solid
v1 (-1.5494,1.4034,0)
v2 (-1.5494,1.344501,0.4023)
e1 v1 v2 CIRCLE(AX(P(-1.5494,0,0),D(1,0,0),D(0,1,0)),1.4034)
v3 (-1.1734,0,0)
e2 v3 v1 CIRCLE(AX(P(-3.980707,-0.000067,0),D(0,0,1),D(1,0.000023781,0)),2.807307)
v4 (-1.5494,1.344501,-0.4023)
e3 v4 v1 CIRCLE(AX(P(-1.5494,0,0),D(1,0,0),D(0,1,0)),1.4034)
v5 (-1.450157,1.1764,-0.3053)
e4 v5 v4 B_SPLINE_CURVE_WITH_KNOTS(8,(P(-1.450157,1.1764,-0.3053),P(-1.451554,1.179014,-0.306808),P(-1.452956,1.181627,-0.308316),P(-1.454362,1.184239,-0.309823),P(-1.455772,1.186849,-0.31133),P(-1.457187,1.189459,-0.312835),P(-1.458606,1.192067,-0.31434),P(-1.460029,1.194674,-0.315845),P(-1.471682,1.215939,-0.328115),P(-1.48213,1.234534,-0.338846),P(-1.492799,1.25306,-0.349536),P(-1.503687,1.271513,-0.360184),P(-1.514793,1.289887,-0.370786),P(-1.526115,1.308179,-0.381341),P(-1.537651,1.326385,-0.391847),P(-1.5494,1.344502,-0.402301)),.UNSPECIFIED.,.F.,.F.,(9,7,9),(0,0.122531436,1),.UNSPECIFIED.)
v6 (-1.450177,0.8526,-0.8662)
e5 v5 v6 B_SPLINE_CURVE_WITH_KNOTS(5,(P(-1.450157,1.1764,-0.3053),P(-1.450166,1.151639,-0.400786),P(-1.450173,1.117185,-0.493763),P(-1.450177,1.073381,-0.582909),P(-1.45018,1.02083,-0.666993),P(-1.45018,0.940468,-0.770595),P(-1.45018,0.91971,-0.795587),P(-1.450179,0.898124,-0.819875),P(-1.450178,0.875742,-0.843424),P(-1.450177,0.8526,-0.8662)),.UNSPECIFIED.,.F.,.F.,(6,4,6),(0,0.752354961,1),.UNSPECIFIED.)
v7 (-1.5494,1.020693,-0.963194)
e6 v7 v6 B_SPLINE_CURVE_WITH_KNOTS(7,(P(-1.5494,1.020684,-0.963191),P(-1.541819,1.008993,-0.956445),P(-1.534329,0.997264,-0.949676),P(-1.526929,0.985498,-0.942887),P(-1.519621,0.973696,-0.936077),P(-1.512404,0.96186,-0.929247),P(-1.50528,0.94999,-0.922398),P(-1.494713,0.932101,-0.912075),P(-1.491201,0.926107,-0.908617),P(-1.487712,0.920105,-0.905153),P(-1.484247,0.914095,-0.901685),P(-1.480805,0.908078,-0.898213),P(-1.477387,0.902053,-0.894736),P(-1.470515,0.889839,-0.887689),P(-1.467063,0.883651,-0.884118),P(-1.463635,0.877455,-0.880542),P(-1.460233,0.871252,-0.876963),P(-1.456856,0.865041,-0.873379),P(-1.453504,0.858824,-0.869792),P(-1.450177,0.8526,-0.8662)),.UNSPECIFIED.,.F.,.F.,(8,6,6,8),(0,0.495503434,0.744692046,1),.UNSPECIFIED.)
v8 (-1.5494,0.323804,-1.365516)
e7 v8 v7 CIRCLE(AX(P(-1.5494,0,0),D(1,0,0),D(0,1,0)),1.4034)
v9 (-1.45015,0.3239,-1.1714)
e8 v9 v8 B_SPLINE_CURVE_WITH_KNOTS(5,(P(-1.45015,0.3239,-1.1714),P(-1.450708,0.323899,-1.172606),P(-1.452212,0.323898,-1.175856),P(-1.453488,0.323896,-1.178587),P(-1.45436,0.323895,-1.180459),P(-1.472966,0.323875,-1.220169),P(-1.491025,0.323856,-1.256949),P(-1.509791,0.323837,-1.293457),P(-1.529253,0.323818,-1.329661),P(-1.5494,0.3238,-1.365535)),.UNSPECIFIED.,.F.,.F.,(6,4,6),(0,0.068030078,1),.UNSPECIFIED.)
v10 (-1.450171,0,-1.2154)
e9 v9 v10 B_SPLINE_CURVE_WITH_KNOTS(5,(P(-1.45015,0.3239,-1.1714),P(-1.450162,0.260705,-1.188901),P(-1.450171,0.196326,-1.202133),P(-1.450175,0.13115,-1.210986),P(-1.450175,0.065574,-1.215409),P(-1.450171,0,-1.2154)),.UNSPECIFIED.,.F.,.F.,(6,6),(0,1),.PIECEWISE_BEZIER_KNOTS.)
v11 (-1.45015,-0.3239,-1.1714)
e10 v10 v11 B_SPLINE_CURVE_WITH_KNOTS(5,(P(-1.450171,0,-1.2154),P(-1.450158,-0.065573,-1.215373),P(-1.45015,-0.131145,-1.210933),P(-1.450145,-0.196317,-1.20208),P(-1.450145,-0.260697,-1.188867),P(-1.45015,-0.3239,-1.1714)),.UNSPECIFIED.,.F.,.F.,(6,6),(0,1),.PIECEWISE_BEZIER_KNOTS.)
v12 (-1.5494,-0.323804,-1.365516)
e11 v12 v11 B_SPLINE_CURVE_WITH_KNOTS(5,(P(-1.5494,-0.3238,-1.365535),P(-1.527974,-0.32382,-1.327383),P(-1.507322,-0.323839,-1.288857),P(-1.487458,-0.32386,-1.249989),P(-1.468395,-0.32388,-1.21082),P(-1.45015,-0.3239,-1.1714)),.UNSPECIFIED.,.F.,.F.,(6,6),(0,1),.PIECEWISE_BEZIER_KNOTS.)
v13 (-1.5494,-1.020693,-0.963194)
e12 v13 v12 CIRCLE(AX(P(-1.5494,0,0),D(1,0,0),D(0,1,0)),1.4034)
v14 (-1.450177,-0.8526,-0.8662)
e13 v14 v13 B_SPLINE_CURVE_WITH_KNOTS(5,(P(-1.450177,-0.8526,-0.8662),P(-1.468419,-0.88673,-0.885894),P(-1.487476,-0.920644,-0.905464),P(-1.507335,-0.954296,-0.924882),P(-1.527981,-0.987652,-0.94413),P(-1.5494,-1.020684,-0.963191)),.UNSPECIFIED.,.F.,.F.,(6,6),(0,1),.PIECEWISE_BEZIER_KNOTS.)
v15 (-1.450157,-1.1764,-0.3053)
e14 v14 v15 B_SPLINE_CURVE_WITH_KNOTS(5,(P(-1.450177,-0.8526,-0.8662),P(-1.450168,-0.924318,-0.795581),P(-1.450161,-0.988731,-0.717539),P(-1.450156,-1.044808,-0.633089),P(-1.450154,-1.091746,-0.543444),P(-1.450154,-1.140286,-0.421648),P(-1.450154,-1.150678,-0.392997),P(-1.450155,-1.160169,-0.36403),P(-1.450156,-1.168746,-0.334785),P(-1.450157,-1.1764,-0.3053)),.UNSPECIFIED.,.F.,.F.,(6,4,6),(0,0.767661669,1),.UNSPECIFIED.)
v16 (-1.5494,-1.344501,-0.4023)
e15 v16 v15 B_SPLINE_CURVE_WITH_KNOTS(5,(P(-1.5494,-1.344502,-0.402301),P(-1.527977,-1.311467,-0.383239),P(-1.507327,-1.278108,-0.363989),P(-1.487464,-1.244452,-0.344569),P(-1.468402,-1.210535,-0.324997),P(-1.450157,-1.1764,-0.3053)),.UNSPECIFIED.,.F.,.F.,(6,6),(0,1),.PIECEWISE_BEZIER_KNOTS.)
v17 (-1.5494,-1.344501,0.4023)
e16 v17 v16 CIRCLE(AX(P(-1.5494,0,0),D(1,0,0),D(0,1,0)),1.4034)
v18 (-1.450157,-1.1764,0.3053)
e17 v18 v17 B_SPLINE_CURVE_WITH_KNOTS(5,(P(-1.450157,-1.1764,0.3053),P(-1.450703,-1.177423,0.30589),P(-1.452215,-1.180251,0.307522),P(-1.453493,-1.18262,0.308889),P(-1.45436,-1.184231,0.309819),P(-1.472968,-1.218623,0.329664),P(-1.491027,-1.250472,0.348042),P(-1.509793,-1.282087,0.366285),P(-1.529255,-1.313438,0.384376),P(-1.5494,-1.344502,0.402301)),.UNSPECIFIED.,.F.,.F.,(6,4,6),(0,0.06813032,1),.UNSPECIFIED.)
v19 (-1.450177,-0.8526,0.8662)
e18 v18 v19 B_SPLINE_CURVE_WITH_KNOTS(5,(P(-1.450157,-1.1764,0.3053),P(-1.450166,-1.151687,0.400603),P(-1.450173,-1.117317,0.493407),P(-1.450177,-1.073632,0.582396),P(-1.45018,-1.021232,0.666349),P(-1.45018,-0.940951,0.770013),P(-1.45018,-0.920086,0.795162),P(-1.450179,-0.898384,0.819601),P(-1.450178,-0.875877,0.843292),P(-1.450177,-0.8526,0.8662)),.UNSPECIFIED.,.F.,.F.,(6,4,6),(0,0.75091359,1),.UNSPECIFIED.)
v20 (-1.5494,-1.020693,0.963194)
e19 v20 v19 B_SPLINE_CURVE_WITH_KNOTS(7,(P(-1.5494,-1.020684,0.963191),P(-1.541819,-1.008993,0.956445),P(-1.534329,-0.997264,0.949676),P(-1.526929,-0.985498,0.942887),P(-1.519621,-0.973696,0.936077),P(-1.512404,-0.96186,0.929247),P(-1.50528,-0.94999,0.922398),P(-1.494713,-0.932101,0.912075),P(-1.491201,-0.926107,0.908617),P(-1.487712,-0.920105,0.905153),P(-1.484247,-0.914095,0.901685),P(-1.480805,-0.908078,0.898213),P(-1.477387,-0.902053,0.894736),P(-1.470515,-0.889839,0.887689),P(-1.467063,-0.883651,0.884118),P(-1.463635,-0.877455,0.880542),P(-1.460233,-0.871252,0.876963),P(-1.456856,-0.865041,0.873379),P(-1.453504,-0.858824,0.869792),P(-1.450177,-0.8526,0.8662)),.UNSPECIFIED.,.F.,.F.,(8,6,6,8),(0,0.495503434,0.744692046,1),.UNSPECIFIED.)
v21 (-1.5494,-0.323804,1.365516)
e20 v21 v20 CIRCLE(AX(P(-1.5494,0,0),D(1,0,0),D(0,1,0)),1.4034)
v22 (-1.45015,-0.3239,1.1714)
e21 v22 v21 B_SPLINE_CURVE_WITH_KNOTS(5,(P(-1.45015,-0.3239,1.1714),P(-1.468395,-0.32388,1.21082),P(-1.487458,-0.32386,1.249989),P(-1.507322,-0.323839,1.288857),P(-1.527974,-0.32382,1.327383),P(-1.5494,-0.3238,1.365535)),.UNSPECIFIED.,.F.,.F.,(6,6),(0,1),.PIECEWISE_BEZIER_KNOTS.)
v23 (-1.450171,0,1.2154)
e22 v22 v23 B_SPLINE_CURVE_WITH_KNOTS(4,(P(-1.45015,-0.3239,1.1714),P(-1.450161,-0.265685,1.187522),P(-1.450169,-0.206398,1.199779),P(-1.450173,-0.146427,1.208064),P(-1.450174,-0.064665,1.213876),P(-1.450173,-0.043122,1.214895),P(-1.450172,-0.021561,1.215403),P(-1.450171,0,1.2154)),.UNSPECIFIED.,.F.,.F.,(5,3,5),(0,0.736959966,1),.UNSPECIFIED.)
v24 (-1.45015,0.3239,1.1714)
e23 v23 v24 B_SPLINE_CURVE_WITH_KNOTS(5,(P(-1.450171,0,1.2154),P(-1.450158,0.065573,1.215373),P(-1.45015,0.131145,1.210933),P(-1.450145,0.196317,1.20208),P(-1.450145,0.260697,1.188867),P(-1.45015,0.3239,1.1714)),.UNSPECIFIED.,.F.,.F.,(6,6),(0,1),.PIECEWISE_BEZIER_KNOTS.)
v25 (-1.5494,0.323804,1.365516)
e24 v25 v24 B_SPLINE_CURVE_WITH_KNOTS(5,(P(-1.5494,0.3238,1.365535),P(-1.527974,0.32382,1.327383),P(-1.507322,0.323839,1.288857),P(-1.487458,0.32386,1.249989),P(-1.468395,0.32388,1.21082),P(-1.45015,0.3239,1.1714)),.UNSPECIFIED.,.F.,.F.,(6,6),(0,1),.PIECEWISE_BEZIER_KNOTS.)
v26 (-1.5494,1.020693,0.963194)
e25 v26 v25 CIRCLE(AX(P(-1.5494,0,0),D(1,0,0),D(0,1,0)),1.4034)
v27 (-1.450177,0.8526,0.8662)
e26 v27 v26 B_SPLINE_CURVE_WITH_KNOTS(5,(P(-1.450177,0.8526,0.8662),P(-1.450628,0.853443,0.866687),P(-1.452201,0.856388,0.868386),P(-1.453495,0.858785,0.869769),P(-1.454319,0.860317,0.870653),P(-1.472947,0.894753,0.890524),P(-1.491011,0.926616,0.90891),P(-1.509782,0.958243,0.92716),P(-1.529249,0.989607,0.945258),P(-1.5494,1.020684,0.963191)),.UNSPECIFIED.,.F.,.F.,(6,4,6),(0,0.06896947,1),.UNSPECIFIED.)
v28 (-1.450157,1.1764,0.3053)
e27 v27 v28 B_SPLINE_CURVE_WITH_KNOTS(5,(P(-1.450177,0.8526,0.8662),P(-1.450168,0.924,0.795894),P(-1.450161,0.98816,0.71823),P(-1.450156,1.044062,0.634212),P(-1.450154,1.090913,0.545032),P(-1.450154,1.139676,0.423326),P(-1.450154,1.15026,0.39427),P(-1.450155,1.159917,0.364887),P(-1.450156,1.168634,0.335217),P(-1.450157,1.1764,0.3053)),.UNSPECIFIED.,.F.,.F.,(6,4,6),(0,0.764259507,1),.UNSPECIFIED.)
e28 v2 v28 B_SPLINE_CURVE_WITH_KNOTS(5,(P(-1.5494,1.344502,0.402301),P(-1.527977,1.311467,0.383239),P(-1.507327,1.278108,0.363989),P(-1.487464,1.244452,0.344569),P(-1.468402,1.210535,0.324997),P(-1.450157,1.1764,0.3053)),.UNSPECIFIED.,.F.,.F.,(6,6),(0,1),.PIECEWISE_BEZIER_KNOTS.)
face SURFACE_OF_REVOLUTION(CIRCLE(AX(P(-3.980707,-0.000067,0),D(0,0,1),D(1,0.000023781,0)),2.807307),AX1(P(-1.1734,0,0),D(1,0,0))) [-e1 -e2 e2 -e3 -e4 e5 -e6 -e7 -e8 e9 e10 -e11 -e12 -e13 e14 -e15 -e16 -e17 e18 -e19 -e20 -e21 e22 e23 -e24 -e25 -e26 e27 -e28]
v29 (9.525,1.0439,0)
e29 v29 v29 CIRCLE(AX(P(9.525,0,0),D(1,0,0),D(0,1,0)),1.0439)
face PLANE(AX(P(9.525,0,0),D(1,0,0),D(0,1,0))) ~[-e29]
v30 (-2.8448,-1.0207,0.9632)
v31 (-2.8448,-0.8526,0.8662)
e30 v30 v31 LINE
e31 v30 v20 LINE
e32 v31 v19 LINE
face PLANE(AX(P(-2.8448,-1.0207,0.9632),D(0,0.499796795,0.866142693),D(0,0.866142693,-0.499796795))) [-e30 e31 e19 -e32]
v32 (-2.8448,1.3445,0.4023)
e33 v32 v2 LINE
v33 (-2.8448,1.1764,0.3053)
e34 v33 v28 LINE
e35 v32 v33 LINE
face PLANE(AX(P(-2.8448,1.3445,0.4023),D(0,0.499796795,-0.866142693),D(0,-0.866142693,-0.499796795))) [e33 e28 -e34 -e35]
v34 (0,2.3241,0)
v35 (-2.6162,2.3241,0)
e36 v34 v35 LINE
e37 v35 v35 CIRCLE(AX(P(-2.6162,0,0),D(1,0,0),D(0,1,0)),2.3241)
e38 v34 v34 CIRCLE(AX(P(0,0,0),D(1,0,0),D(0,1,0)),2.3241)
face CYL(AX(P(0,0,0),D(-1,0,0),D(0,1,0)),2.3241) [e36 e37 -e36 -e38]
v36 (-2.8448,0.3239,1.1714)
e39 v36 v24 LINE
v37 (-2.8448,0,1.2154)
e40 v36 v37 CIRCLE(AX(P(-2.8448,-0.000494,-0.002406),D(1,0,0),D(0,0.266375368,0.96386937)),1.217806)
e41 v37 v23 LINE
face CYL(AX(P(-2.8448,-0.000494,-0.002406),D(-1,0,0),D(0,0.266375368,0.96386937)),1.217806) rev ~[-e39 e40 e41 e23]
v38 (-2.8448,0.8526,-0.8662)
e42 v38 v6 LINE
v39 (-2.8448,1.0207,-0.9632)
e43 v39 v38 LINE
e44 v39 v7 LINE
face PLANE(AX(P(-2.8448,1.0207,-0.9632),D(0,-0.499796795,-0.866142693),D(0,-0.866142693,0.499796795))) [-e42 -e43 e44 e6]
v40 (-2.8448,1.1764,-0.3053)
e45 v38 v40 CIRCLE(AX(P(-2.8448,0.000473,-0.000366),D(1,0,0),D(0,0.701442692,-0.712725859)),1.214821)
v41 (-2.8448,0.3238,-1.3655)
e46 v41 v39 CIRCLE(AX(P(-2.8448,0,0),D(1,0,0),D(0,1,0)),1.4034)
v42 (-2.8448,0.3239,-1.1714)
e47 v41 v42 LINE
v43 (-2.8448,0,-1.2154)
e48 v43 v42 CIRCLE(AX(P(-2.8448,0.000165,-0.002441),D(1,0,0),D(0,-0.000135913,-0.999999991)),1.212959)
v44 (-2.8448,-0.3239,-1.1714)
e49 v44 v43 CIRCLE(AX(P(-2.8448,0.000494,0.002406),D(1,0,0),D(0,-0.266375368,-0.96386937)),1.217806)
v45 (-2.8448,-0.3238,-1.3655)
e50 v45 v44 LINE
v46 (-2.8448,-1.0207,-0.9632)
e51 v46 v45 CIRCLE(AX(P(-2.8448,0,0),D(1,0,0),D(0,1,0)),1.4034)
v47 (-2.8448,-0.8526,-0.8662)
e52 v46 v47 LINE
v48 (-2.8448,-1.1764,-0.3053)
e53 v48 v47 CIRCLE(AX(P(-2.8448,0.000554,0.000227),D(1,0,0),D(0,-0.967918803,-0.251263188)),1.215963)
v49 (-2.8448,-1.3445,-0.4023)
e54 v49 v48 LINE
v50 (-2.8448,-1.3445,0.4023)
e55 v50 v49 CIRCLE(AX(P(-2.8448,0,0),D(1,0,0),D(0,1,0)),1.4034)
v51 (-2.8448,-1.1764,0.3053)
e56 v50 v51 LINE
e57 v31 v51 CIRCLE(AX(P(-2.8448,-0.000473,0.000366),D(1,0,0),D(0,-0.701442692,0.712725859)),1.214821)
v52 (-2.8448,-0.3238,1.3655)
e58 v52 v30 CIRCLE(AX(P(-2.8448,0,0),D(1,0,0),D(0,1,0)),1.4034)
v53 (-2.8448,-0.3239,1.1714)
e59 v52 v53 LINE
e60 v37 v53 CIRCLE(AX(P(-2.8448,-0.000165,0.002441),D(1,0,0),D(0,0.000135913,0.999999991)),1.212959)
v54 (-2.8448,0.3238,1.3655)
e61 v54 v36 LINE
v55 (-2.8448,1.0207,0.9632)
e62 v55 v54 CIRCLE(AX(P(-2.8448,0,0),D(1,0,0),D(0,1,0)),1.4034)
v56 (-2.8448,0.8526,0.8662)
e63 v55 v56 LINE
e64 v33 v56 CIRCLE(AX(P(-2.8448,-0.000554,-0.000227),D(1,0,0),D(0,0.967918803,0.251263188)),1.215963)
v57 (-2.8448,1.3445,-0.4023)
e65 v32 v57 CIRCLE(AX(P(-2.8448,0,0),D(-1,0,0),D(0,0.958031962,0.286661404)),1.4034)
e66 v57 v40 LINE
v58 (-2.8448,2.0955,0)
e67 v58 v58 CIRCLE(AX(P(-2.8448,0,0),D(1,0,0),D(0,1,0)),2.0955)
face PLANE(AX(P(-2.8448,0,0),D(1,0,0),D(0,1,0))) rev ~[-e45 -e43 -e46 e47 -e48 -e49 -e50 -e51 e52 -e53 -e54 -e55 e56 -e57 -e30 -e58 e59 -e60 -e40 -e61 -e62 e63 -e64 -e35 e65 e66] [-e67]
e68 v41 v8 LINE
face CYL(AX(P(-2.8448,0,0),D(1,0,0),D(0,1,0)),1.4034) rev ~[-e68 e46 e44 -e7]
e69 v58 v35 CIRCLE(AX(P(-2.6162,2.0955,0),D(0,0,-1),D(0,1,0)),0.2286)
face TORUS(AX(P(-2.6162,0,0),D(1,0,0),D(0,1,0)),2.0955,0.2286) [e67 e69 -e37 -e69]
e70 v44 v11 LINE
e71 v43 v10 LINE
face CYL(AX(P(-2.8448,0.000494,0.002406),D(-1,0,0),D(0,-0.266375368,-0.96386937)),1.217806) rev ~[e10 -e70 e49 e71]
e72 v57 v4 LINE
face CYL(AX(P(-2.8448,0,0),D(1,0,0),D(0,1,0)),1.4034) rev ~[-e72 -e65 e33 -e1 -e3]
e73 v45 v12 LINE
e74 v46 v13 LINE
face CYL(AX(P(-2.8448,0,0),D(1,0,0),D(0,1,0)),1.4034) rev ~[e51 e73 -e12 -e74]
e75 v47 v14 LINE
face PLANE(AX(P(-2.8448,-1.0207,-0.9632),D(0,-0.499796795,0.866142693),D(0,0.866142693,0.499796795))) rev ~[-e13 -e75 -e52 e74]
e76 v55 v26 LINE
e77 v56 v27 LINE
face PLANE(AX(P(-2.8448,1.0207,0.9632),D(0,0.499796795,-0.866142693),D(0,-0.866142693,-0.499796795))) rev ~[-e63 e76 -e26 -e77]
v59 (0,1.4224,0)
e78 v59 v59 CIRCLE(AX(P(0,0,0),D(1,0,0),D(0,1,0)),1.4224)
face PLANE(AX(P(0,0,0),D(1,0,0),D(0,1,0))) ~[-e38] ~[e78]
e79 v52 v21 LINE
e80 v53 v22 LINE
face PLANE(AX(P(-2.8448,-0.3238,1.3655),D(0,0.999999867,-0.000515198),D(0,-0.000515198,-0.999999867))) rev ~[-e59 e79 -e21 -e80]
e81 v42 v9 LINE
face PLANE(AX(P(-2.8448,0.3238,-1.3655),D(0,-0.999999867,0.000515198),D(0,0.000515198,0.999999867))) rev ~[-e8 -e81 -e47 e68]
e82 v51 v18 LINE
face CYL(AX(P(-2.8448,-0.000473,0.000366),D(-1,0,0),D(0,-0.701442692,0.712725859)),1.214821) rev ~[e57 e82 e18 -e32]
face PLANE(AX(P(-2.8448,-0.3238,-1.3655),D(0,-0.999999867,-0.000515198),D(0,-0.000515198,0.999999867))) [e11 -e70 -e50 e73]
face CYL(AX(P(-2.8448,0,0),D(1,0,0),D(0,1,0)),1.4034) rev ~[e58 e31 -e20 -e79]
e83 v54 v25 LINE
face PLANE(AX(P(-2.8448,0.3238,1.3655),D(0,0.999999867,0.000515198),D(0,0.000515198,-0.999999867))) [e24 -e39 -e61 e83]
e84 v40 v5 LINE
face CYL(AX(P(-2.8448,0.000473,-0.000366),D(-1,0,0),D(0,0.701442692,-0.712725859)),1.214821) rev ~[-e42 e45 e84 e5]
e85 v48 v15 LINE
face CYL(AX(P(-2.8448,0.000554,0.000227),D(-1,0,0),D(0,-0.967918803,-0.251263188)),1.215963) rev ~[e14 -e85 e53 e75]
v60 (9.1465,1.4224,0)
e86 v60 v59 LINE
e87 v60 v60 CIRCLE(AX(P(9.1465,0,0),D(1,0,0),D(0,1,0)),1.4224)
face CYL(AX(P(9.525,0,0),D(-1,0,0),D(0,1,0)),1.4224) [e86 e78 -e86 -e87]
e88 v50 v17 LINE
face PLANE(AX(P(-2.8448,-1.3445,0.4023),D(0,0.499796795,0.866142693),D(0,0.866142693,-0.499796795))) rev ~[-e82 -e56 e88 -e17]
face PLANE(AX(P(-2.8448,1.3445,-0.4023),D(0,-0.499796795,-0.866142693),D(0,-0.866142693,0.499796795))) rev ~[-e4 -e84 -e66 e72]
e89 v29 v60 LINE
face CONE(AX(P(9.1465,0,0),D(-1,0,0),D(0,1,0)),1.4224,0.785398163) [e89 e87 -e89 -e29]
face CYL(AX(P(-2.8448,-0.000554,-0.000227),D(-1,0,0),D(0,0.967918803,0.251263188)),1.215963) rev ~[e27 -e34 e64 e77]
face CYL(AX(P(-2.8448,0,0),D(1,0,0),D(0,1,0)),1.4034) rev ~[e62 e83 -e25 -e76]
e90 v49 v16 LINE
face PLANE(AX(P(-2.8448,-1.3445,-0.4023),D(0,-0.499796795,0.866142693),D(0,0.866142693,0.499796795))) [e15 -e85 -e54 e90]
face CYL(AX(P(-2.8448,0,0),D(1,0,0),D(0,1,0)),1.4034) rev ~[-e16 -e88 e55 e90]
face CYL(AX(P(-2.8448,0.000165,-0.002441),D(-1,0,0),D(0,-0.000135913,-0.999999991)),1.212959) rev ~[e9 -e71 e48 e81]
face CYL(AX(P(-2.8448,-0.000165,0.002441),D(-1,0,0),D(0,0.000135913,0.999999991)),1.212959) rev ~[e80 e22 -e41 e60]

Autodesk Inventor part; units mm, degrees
ref_plane "YZ Plane" through (0, 0, 0) normal (1, 0, 0) x (0, 1, 0)
sketch "Sketch1" plane through (0, 0, 0) normal (0, 0, 1) x (1, 0, 0)
  line L0 (-2.8448, 0) -> (9.525, 0)
  line L1 (9.525, 0) -> (9.525, 1.4224)
  line L2 (9.525, 1.4224) -> (0, 1.4224)
  line L3 (0, 1.4224) -> (0, 2.3241)
  line L4 (-7.3162, 0) -> (16.036, 0) projected
  line L5 (0, -0.4648) -> (0, 2.7889) projected
  line L6 (0, 2.3241) -> (-2.8448, 2.3241)
  line L7 (-2.8448, 0) -> (-2.8448, 2.3241)
  arc A0 (-1.1734, 0) -> (-1.5494, 1.4034) centre (-3.9802, 0) ccw
  line L8 (-2.8448, 1.4034) -> (-1.5494, 1.4034)
  line L9 (12.7, 1.4224) -> (0, 1.4224) construction
  dimension "d0" = 9.525
  dimension "d1" = 2.8448
  dimension "d2" = 2.8448
  dimension "d5" = 4.6482
  dimension "d13" = 2.8068
  dimension "d14" = 2.8068
  dimension "d15" = 1.2954
revolve "Body" add sketch "Sketch1" angle 360 about axis through (-2.8448, 0, 0) along (1, 0, 0) contours A0 L8 L7 L6 L3 L5 L0 | L5 L2 L1 L0
ref_plane "IDS_WORKPLANE{1}" through (-2.8448, 0, 0) normal (1, 0, 0) x (0, 0, -1)
sketch "Sketch2" plane through (-2.8448, 0, 0) normal (1, 0, 0) x (0, 0, -1)
  line L0 (0, -3.6027) -> (0, 5.3473) projected
  line L1 (5.6384, 0) -> (-3.6512, 0) projected
  circle A0 centre (0, 0) radius 2.3241 projected
  line L2 (1.3655, 0.3238) -> (1.1714, 0.3239)
  line L3 (0, 0) -> (1.3655, 0.3238) construction
  line L4 (0, 0) -> (4.3113, 4.0687) construction
  line L5 (0, 0) -> (0.4023, 1.3445) construction
  line L6 (0, 0) -> (0.7017, 1.2154) construction
  line L7 (0.4023, 1.3445) -> (0.3053, 1.1764)
  line L8 (0.9632, 1.0207) -> (0.8662, 0.8526)
  line L9 (0, 0) -> (0.9632, 1.0207) construction
  arc A1 (1.2154, 0) -> (1.1714, 0.3239) centre (0, 0) ccw
  arc A2 (0.8662, 0.8526) -> (0.3053, 1.1764) centre (0, 0) ccw
  arc A3 (1.4034, 0) -> (1.3655, 0.3238) centre (0, 0) ccw
  arc A4 (0.9632, 1.0207) -> (0.4023, 1.3445) centre (0, 0) ccw
  arc A5 (1.3655, 0.3238) -> (0.8276, 1.1334) centre (0, 0) ccw construction
  arc A6 (1.1714, 0.3239) -> (0.8662, 0.8526) centre (0, 0) ccw construction
  line L10 (1.3655, -0.3238) -> (1.1714, -0.3239)
  line L11 (0.4023, -1.3445) -> (0.3053, -1.1764)
  line L12 (0.9632, -1.0207) -> (0.8662, -0.8526)
  arc A7 (1.1714, -0.3239) -> (1.2154, 0) centre (0, 0) ccw
  arc A8 (0.3053, -1.1764) -> (0.8662, -0.8526) centre (0, 0) ccw
  arc A9 (1.3655, -0.3238) -> (1.4034, 0) centre (0, 0) ccw
  arc A10 (0.4023, -1.3445) -> (0.9632, -1.0207) centre (0, 0) ccw
  line L13 (-1.3655, 0.3238) -> (-1.1714, 0.3239)
  line L14 (-0.4023, 1.3445) -> (-0.3053, 1.1764)
  line L15 (-0.9632, 1.0207) -> (-0.8662, 0.8526)
  arc A11 (-1.1714, 0.3239) -> (-1.2154, 0) centre (0, 0) ccw
  arc A12 (-0.3053, 1.1764) -> (-0.8662, 0.8526) centre (0, 0) ccw
  arc A13 (-1.3655, 0.3238) -> (-1.4034, 0) centre (0, 0) ccw
  arc A14 (-0.4023, 1.3445) -> (-0.9632, 1.0207) centre (0, 0) ccw
  line L16 (-0.4023, -1.3445) -> (-0.3053, -1.1764)
  arc A15 (-0.8662, -0.8526) -> (-0.3053, -1.1764) centre (0, 0) ccw
  line L17 (-0.9632, -1.0207) -> (-0.8662, -0.8526)
  arc A16 (-0.9632, -1.0207) -> (-0.4023, -1.3445) centre (0, 0) ccw
  arc A17 (-1.2154, 0) -> (-1.1714, -0.3239) centre (0, 0) ccw
  line L18 (-1.3655, -0.3238) -> (-1.1714, -0.3239)
  arc A18 (-1.4034, 0) -> (-1.3655, -0.3238) centre (0, 0) ccw
  point P0 (0.7017, -1.2154)
  point P1 (-0.7017, 1.2154)
  point P2 (-0.7017, -1.2154)
  dimension "d19" = 0.3239
  dimension "d20" = 0.6477
  dimension "d21" = 33.316
  dimension "d22" = 2.8068
  dimension "d23" = 2.4308
extrude "Slot" add sketch "Sketch2" along normal up to next contours A1 L2 A3 L1 | L1 A9 L10 A7 | A17 L18 A18 L1 | L1 A13 L13 A11 | A4 L8 A2 L7 | L11 A8 L12 A10 | L14 A12 L15 A14 | A16 L17 A15 L16
fillet "Fillet1" radius 0.2286 1 edges at (-2.8448, -2.3241, 0)
thread "Thread" size "4-40 UNC" class "2A" standard "ANSI Unified Screw Threads" length 7.9375
chamfer "Chamfer1" distance 0.3785 distance2 0.3785 1 edges at (9.525, -1.4224, 0) measured on face at (9.525, -0.2537, -0.5191)
ref_plane "Work Plane2" through (-1.4224, 0, 0) normal (0, 0, -1) x (1, 0, 0)
equation "\"d19\" = 0.5 * SBR"
equation "\"d20\" = SBR"
equation "\"d22\" = 1.1547 * SW"
equation "\"d23\" = SW"
equation "\"d17\" = INTI"
equation "\"d24\" = RR"
equation "\"d6\" = GEL"
equation "\"d9\" = -0.5 * SPD + 0.5 * NND"
equation "\"d10\" = GUL"
equation "\"d0\" = NLG"
equation "\"d1\" = KOH"
equation "\"d2\" = NND"
equation "\"d5\" = KOD"
equation "\"d13\" = 1.1547 * SW"
equation "\"d14\" = 1.1547 * SW"
equation "\"d15\" = INTI"
equation "\"NND\" = 2.8448"
equation "\"NLG\" = 9.525"
equation "\"GEL\" = 7.9375"
equation "\"KOD\" = 4.6482"
equation "\"KOH\" = 2.8448"
equation "\"SPD\" = GD1"
equation "\"GUL\" = 0.37846"
equation "\"SBR\" = 0.6477"
equation "\"INTI\" = 1.2954"
equation "\"d11\" = -KOH"
equation "\"SW\" = 2.43078"
equation "\"d16\" = 1.1547 * SW"
equation "\"d18\" = SW"
equation "\"RR\" = 0.2286"
equation "\"TOA\" = 30deg"
equation "\"GD1\" = 2.08788"
equation "\"THREADDIA\" = 2.8448"
equation "\"BDM\" = NND"
equation "\"GD\" = NND"
equation "\"GAL\" = 1.5875"
equation "\"E0\" = 2.86258"
properties part number "ANSI B18.3 - 4-40 UNC - 0.375, SSHCSI" material "Steel, Mild"
